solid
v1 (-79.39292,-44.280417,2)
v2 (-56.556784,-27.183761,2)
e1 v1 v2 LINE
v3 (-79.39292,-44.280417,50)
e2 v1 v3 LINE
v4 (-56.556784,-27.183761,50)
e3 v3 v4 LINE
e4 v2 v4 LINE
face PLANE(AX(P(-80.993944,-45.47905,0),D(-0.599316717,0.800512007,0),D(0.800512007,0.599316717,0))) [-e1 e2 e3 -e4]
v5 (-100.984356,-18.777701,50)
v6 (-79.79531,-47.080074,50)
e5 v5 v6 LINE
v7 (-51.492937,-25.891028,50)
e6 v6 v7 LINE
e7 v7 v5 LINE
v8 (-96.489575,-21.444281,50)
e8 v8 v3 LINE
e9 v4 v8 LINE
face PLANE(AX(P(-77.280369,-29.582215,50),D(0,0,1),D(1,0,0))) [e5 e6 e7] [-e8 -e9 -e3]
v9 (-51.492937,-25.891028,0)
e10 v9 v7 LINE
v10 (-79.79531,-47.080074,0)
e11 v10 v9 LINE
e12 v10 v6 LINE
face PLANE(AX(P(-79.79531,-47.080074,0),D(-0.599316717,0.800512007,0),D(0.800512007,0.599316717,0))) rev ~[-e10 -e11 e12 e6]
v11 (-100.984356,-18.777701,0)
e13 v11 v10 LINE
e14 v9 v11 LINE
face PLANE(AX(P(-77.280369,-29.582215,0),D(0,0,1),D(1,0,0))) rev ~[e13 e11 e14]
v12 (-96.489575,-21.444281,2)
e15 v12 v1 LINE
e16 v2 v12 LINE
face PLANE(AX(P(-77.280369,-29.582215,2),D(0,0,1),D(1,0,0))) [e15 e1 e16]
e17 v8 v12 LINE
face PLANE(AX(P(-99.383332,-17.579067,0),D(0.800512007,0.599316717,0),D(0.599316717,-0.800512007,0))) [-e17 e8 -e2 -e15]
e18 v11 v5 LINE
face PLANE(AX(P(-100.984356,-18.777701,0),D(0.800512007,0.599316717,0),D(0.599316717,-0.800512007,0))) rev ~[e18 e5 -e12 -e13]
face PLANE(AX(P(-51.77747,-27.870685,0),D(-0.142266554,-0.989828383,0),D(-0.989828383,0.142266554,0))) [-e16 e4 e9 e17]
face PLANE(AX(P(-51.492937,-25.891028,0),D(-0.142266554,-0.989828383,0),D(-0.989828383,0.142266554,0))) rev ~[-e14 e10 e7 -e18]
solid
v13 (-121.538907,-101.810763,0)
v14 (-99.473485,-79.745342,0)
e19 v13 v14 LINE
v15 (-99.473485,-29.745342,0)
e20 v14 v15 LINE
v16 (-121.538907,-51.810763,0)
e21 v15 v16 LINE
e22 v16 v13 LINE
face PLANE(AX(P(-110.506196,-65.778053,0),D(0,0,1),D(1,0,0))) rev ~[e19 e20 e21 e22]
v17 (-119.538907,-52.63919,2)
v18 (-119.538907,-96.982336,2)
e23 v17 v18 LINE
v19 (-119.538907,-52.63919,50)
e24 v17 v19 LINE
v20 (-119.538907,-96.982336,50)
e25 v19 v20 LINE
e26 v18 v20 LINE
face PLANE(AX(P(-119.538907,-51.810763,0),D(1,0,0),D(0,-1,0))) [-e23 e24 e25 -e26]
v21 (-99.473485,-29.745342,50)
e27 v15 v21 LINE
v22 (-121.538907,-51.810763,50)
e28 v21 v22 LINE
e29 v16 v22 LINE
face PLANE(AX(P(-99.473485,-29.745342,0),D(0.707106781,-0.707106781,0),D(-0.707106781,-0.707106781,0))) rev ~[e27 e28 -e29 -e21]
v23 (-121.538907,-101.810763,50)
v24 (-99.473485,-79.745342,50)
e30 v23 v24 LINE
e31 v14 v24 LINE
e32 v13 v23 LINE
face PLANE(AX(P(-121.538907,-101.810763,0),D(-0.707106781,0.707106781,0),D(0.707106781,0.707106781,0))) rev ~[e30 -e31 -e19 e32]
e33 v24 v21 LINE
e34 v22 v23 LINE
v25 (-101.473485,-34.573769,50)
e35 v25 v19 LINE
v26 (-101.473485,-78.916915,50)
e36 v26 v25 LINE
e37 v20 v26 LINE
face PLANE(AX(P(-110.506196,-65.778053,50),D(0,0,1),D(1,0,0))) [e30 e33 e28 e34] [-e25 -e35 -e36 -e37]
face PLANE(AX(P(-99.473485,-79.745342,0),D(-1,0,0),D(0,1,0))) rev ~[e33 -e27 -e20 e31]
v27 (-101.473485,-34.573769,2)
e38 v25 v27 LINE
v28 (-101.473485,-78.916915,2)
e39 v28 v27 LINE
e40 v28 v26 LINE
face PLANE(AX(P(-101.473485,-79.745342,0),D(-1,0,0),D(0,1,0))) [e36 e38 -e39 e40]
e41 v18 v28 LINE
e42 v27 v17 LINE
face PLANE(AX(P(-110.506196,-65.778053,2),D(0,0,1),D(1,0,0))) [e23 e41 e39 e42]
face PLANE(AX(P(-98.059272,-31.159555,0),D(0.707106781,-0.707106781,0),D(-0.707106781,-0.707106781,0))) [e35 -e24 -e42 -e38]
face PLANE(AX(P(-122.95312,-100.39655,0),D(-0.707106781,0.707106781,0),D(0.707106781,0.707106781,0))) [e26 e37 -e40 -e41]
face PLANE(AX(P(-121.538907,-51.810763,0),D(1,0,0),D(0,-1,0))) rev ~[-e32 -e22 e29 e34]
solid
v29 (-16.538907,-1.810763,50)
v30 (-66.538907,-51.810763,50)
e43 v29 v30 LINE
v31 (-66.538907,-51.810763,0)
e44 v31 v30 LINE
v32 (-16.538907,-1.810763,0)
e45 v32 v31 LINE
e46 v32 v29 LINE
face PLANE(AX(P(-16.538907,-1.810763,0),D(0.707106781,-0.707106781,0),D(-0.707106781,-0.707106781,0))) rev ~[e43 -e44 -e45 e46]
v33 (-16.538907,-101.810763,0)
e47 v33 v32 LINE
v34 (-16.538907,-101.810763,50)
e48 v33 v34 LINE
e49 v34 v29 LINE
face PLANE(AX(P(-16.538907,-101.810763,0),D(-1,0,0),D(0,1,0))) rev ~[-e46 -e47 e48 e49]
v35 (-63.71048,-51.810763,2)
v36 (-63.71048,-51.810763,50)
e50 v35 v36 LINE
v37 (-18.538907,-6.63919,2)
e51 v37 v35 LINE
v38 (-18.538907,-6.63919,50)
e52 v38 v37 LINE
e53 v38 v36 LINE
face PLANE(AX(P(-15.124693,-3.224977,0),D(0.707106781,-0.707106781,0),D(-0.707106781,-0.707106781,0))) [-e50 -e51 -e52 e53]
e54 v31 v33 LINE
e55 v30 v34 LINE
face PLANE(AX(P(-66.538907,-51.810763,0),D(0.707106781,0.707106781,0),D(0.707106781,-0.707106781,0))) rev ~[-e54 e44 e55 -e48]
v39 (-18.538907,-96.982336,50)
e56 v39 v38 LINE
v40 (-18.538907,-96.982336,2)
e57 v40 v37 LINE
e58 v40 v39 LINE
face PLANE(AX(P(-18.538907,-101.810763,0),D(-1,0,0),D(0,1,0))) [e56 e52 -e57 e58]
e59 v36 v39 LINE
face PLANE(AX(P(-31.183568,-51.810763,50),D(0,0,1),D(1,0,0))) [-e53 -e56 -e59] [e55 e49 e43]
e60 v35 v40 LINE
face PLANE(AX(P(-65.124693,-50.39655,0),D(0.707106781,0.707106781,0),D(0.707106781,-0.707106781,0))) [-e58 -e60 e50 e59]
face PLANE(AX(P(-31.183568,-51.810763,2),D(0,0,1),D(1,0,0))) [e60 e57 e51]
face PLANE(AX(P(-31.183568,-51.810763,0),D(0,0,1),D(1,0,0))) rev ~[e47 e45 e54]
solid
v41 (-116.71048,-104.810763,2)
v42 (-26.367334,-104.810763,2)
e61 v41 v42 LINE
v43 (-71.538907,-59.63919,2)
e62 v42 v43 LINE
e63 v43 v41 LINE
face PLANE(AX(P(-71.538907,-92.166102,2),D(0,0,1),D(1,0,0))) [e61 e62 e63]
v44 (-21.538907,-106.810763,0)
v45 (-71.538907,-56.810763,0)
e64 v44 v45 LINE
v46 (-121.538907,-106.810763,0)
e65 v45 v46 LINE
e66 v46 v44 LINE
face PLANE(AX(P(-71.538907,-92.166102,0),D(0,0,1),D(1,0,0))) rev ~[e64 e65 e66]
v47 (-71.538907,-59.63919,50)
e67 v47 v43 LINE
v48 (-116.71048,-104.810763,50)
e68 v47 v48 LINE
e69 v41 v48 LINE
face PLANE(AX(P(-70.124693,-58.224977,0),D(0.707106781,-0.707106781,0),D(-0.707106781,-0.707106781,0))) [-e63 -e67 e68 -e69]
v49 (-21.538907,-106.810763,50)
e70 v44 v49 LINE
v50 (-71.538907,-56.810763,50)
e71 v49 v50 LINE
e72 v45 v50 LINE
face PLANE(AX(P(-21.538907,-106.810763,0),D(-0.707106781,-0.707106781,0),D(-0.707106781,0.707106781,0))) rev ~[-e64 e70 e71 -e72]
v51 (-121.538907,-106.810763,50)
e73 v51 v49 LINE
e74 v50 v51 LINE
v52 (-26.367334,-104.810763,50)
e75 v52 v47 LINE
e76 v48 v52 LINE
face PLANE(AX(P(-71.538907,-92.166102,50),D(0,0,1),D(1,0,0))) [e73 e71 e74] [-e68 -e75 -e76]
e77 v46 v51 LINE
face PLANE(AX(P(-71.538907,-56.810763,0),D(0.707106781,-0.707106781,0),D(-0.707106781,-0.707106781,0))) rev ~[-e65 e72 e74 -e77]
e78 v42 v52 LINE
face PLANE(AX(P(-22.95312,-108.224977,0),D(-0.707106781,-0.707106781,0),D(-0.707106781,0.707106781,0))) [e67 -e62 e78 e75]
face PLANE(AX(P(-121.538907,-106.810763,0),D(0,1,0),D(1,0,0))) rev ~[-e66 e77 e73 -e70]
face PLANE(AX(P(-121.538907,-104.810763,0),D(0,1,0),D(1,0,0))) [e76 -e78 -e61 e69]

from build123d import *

# Parameters (mm, degrees)
F1_DEPTH = 50
F2_T     = -2
F2_2_T   = -2
F2_3_T   = -2
F2_4_T   = -2


# Not quite as in the source:
# - a feature names something its author has since deleted; it is built from what else it names


with BuildPart() as f1:
    # F0 (on Top) → F1 (new body)
    with BuildSketch(Plane.XY):
        Polygon((-16.5389066256, -1.8107631532), (-66.5389066256, -51.8107631532), (-16.5389066256, -101.8107631532), align=None)
    extrude(amount=F1_DEPTH)

    # F2
    f2_openings = [f1.faces().sort_by_distance(p)[0] for p in [
        (-33.205573, -51.810763, 50),
    ]]
    offset(amount=F2_T, openings=f2_openings)


with BuildPart() as f1b:
    # F0 (on Top) → F1, piece 2 (new body)
    with BuildSketch(Plane.XY):
        Polygon((-100.9843560544, -18.7777006427), (-79.7953103328, -47.0800740662), (-51.4929369092, -25.8910283446), align=None)
    extrude(amount=F1_DEPTH)

    # F2#3
    f2_3_openings = [f1b.faces().sort_by_distance(p)[0] for p in [
        (-77.424201, -30.582934, 50),
    ]]
    offset(amount=F2_3_T, openings=f2_3_openings)


with BuildPart() as f1c:
    # F0 (on Top) → F1, piece 3 (new body)
    with BuildSketch(Plane.XY):
        Polygon((-99.47348535, -29.7453418775), (-121.5389066256, -51.8107631532), (-121.5389066256, -101.8107631532), (-99.47348535, -79.7453418775), align=None)
    extrude(amount=F1_DEPTH)

    # F2#4
    f2_4_openings = [f1c.faces().sort_by_distance(p)[0] for p in [
        (-110.506196, -65.778053, 50),
    ]]
    offset(amount=F2_4_T, openings=f2_4_openings)


with BuildPart() as f1d:
    # F0 (on Top) → F1, piece 4 (new body)
    with BuildSketch(Plane.XY):
        Polygon((-71.5389066256, -56.8107631532), (-121.5389066256, -106.8107631532), (-21.5389066256, -106.8107631532), align=None)
    extrude(amount=F1_DEPTH)

    # F2#2
    f2_2_openings = [f1d.faces().sort_by_distance(p)[0] for p in [
        (-71.538907, -90.144096, 50),
    ]]
    offset(amount=F2_2_T, openings=f2_2_openings)


solid = Compound([f1.part, f1b.part, f1c.part, f1d.part])
